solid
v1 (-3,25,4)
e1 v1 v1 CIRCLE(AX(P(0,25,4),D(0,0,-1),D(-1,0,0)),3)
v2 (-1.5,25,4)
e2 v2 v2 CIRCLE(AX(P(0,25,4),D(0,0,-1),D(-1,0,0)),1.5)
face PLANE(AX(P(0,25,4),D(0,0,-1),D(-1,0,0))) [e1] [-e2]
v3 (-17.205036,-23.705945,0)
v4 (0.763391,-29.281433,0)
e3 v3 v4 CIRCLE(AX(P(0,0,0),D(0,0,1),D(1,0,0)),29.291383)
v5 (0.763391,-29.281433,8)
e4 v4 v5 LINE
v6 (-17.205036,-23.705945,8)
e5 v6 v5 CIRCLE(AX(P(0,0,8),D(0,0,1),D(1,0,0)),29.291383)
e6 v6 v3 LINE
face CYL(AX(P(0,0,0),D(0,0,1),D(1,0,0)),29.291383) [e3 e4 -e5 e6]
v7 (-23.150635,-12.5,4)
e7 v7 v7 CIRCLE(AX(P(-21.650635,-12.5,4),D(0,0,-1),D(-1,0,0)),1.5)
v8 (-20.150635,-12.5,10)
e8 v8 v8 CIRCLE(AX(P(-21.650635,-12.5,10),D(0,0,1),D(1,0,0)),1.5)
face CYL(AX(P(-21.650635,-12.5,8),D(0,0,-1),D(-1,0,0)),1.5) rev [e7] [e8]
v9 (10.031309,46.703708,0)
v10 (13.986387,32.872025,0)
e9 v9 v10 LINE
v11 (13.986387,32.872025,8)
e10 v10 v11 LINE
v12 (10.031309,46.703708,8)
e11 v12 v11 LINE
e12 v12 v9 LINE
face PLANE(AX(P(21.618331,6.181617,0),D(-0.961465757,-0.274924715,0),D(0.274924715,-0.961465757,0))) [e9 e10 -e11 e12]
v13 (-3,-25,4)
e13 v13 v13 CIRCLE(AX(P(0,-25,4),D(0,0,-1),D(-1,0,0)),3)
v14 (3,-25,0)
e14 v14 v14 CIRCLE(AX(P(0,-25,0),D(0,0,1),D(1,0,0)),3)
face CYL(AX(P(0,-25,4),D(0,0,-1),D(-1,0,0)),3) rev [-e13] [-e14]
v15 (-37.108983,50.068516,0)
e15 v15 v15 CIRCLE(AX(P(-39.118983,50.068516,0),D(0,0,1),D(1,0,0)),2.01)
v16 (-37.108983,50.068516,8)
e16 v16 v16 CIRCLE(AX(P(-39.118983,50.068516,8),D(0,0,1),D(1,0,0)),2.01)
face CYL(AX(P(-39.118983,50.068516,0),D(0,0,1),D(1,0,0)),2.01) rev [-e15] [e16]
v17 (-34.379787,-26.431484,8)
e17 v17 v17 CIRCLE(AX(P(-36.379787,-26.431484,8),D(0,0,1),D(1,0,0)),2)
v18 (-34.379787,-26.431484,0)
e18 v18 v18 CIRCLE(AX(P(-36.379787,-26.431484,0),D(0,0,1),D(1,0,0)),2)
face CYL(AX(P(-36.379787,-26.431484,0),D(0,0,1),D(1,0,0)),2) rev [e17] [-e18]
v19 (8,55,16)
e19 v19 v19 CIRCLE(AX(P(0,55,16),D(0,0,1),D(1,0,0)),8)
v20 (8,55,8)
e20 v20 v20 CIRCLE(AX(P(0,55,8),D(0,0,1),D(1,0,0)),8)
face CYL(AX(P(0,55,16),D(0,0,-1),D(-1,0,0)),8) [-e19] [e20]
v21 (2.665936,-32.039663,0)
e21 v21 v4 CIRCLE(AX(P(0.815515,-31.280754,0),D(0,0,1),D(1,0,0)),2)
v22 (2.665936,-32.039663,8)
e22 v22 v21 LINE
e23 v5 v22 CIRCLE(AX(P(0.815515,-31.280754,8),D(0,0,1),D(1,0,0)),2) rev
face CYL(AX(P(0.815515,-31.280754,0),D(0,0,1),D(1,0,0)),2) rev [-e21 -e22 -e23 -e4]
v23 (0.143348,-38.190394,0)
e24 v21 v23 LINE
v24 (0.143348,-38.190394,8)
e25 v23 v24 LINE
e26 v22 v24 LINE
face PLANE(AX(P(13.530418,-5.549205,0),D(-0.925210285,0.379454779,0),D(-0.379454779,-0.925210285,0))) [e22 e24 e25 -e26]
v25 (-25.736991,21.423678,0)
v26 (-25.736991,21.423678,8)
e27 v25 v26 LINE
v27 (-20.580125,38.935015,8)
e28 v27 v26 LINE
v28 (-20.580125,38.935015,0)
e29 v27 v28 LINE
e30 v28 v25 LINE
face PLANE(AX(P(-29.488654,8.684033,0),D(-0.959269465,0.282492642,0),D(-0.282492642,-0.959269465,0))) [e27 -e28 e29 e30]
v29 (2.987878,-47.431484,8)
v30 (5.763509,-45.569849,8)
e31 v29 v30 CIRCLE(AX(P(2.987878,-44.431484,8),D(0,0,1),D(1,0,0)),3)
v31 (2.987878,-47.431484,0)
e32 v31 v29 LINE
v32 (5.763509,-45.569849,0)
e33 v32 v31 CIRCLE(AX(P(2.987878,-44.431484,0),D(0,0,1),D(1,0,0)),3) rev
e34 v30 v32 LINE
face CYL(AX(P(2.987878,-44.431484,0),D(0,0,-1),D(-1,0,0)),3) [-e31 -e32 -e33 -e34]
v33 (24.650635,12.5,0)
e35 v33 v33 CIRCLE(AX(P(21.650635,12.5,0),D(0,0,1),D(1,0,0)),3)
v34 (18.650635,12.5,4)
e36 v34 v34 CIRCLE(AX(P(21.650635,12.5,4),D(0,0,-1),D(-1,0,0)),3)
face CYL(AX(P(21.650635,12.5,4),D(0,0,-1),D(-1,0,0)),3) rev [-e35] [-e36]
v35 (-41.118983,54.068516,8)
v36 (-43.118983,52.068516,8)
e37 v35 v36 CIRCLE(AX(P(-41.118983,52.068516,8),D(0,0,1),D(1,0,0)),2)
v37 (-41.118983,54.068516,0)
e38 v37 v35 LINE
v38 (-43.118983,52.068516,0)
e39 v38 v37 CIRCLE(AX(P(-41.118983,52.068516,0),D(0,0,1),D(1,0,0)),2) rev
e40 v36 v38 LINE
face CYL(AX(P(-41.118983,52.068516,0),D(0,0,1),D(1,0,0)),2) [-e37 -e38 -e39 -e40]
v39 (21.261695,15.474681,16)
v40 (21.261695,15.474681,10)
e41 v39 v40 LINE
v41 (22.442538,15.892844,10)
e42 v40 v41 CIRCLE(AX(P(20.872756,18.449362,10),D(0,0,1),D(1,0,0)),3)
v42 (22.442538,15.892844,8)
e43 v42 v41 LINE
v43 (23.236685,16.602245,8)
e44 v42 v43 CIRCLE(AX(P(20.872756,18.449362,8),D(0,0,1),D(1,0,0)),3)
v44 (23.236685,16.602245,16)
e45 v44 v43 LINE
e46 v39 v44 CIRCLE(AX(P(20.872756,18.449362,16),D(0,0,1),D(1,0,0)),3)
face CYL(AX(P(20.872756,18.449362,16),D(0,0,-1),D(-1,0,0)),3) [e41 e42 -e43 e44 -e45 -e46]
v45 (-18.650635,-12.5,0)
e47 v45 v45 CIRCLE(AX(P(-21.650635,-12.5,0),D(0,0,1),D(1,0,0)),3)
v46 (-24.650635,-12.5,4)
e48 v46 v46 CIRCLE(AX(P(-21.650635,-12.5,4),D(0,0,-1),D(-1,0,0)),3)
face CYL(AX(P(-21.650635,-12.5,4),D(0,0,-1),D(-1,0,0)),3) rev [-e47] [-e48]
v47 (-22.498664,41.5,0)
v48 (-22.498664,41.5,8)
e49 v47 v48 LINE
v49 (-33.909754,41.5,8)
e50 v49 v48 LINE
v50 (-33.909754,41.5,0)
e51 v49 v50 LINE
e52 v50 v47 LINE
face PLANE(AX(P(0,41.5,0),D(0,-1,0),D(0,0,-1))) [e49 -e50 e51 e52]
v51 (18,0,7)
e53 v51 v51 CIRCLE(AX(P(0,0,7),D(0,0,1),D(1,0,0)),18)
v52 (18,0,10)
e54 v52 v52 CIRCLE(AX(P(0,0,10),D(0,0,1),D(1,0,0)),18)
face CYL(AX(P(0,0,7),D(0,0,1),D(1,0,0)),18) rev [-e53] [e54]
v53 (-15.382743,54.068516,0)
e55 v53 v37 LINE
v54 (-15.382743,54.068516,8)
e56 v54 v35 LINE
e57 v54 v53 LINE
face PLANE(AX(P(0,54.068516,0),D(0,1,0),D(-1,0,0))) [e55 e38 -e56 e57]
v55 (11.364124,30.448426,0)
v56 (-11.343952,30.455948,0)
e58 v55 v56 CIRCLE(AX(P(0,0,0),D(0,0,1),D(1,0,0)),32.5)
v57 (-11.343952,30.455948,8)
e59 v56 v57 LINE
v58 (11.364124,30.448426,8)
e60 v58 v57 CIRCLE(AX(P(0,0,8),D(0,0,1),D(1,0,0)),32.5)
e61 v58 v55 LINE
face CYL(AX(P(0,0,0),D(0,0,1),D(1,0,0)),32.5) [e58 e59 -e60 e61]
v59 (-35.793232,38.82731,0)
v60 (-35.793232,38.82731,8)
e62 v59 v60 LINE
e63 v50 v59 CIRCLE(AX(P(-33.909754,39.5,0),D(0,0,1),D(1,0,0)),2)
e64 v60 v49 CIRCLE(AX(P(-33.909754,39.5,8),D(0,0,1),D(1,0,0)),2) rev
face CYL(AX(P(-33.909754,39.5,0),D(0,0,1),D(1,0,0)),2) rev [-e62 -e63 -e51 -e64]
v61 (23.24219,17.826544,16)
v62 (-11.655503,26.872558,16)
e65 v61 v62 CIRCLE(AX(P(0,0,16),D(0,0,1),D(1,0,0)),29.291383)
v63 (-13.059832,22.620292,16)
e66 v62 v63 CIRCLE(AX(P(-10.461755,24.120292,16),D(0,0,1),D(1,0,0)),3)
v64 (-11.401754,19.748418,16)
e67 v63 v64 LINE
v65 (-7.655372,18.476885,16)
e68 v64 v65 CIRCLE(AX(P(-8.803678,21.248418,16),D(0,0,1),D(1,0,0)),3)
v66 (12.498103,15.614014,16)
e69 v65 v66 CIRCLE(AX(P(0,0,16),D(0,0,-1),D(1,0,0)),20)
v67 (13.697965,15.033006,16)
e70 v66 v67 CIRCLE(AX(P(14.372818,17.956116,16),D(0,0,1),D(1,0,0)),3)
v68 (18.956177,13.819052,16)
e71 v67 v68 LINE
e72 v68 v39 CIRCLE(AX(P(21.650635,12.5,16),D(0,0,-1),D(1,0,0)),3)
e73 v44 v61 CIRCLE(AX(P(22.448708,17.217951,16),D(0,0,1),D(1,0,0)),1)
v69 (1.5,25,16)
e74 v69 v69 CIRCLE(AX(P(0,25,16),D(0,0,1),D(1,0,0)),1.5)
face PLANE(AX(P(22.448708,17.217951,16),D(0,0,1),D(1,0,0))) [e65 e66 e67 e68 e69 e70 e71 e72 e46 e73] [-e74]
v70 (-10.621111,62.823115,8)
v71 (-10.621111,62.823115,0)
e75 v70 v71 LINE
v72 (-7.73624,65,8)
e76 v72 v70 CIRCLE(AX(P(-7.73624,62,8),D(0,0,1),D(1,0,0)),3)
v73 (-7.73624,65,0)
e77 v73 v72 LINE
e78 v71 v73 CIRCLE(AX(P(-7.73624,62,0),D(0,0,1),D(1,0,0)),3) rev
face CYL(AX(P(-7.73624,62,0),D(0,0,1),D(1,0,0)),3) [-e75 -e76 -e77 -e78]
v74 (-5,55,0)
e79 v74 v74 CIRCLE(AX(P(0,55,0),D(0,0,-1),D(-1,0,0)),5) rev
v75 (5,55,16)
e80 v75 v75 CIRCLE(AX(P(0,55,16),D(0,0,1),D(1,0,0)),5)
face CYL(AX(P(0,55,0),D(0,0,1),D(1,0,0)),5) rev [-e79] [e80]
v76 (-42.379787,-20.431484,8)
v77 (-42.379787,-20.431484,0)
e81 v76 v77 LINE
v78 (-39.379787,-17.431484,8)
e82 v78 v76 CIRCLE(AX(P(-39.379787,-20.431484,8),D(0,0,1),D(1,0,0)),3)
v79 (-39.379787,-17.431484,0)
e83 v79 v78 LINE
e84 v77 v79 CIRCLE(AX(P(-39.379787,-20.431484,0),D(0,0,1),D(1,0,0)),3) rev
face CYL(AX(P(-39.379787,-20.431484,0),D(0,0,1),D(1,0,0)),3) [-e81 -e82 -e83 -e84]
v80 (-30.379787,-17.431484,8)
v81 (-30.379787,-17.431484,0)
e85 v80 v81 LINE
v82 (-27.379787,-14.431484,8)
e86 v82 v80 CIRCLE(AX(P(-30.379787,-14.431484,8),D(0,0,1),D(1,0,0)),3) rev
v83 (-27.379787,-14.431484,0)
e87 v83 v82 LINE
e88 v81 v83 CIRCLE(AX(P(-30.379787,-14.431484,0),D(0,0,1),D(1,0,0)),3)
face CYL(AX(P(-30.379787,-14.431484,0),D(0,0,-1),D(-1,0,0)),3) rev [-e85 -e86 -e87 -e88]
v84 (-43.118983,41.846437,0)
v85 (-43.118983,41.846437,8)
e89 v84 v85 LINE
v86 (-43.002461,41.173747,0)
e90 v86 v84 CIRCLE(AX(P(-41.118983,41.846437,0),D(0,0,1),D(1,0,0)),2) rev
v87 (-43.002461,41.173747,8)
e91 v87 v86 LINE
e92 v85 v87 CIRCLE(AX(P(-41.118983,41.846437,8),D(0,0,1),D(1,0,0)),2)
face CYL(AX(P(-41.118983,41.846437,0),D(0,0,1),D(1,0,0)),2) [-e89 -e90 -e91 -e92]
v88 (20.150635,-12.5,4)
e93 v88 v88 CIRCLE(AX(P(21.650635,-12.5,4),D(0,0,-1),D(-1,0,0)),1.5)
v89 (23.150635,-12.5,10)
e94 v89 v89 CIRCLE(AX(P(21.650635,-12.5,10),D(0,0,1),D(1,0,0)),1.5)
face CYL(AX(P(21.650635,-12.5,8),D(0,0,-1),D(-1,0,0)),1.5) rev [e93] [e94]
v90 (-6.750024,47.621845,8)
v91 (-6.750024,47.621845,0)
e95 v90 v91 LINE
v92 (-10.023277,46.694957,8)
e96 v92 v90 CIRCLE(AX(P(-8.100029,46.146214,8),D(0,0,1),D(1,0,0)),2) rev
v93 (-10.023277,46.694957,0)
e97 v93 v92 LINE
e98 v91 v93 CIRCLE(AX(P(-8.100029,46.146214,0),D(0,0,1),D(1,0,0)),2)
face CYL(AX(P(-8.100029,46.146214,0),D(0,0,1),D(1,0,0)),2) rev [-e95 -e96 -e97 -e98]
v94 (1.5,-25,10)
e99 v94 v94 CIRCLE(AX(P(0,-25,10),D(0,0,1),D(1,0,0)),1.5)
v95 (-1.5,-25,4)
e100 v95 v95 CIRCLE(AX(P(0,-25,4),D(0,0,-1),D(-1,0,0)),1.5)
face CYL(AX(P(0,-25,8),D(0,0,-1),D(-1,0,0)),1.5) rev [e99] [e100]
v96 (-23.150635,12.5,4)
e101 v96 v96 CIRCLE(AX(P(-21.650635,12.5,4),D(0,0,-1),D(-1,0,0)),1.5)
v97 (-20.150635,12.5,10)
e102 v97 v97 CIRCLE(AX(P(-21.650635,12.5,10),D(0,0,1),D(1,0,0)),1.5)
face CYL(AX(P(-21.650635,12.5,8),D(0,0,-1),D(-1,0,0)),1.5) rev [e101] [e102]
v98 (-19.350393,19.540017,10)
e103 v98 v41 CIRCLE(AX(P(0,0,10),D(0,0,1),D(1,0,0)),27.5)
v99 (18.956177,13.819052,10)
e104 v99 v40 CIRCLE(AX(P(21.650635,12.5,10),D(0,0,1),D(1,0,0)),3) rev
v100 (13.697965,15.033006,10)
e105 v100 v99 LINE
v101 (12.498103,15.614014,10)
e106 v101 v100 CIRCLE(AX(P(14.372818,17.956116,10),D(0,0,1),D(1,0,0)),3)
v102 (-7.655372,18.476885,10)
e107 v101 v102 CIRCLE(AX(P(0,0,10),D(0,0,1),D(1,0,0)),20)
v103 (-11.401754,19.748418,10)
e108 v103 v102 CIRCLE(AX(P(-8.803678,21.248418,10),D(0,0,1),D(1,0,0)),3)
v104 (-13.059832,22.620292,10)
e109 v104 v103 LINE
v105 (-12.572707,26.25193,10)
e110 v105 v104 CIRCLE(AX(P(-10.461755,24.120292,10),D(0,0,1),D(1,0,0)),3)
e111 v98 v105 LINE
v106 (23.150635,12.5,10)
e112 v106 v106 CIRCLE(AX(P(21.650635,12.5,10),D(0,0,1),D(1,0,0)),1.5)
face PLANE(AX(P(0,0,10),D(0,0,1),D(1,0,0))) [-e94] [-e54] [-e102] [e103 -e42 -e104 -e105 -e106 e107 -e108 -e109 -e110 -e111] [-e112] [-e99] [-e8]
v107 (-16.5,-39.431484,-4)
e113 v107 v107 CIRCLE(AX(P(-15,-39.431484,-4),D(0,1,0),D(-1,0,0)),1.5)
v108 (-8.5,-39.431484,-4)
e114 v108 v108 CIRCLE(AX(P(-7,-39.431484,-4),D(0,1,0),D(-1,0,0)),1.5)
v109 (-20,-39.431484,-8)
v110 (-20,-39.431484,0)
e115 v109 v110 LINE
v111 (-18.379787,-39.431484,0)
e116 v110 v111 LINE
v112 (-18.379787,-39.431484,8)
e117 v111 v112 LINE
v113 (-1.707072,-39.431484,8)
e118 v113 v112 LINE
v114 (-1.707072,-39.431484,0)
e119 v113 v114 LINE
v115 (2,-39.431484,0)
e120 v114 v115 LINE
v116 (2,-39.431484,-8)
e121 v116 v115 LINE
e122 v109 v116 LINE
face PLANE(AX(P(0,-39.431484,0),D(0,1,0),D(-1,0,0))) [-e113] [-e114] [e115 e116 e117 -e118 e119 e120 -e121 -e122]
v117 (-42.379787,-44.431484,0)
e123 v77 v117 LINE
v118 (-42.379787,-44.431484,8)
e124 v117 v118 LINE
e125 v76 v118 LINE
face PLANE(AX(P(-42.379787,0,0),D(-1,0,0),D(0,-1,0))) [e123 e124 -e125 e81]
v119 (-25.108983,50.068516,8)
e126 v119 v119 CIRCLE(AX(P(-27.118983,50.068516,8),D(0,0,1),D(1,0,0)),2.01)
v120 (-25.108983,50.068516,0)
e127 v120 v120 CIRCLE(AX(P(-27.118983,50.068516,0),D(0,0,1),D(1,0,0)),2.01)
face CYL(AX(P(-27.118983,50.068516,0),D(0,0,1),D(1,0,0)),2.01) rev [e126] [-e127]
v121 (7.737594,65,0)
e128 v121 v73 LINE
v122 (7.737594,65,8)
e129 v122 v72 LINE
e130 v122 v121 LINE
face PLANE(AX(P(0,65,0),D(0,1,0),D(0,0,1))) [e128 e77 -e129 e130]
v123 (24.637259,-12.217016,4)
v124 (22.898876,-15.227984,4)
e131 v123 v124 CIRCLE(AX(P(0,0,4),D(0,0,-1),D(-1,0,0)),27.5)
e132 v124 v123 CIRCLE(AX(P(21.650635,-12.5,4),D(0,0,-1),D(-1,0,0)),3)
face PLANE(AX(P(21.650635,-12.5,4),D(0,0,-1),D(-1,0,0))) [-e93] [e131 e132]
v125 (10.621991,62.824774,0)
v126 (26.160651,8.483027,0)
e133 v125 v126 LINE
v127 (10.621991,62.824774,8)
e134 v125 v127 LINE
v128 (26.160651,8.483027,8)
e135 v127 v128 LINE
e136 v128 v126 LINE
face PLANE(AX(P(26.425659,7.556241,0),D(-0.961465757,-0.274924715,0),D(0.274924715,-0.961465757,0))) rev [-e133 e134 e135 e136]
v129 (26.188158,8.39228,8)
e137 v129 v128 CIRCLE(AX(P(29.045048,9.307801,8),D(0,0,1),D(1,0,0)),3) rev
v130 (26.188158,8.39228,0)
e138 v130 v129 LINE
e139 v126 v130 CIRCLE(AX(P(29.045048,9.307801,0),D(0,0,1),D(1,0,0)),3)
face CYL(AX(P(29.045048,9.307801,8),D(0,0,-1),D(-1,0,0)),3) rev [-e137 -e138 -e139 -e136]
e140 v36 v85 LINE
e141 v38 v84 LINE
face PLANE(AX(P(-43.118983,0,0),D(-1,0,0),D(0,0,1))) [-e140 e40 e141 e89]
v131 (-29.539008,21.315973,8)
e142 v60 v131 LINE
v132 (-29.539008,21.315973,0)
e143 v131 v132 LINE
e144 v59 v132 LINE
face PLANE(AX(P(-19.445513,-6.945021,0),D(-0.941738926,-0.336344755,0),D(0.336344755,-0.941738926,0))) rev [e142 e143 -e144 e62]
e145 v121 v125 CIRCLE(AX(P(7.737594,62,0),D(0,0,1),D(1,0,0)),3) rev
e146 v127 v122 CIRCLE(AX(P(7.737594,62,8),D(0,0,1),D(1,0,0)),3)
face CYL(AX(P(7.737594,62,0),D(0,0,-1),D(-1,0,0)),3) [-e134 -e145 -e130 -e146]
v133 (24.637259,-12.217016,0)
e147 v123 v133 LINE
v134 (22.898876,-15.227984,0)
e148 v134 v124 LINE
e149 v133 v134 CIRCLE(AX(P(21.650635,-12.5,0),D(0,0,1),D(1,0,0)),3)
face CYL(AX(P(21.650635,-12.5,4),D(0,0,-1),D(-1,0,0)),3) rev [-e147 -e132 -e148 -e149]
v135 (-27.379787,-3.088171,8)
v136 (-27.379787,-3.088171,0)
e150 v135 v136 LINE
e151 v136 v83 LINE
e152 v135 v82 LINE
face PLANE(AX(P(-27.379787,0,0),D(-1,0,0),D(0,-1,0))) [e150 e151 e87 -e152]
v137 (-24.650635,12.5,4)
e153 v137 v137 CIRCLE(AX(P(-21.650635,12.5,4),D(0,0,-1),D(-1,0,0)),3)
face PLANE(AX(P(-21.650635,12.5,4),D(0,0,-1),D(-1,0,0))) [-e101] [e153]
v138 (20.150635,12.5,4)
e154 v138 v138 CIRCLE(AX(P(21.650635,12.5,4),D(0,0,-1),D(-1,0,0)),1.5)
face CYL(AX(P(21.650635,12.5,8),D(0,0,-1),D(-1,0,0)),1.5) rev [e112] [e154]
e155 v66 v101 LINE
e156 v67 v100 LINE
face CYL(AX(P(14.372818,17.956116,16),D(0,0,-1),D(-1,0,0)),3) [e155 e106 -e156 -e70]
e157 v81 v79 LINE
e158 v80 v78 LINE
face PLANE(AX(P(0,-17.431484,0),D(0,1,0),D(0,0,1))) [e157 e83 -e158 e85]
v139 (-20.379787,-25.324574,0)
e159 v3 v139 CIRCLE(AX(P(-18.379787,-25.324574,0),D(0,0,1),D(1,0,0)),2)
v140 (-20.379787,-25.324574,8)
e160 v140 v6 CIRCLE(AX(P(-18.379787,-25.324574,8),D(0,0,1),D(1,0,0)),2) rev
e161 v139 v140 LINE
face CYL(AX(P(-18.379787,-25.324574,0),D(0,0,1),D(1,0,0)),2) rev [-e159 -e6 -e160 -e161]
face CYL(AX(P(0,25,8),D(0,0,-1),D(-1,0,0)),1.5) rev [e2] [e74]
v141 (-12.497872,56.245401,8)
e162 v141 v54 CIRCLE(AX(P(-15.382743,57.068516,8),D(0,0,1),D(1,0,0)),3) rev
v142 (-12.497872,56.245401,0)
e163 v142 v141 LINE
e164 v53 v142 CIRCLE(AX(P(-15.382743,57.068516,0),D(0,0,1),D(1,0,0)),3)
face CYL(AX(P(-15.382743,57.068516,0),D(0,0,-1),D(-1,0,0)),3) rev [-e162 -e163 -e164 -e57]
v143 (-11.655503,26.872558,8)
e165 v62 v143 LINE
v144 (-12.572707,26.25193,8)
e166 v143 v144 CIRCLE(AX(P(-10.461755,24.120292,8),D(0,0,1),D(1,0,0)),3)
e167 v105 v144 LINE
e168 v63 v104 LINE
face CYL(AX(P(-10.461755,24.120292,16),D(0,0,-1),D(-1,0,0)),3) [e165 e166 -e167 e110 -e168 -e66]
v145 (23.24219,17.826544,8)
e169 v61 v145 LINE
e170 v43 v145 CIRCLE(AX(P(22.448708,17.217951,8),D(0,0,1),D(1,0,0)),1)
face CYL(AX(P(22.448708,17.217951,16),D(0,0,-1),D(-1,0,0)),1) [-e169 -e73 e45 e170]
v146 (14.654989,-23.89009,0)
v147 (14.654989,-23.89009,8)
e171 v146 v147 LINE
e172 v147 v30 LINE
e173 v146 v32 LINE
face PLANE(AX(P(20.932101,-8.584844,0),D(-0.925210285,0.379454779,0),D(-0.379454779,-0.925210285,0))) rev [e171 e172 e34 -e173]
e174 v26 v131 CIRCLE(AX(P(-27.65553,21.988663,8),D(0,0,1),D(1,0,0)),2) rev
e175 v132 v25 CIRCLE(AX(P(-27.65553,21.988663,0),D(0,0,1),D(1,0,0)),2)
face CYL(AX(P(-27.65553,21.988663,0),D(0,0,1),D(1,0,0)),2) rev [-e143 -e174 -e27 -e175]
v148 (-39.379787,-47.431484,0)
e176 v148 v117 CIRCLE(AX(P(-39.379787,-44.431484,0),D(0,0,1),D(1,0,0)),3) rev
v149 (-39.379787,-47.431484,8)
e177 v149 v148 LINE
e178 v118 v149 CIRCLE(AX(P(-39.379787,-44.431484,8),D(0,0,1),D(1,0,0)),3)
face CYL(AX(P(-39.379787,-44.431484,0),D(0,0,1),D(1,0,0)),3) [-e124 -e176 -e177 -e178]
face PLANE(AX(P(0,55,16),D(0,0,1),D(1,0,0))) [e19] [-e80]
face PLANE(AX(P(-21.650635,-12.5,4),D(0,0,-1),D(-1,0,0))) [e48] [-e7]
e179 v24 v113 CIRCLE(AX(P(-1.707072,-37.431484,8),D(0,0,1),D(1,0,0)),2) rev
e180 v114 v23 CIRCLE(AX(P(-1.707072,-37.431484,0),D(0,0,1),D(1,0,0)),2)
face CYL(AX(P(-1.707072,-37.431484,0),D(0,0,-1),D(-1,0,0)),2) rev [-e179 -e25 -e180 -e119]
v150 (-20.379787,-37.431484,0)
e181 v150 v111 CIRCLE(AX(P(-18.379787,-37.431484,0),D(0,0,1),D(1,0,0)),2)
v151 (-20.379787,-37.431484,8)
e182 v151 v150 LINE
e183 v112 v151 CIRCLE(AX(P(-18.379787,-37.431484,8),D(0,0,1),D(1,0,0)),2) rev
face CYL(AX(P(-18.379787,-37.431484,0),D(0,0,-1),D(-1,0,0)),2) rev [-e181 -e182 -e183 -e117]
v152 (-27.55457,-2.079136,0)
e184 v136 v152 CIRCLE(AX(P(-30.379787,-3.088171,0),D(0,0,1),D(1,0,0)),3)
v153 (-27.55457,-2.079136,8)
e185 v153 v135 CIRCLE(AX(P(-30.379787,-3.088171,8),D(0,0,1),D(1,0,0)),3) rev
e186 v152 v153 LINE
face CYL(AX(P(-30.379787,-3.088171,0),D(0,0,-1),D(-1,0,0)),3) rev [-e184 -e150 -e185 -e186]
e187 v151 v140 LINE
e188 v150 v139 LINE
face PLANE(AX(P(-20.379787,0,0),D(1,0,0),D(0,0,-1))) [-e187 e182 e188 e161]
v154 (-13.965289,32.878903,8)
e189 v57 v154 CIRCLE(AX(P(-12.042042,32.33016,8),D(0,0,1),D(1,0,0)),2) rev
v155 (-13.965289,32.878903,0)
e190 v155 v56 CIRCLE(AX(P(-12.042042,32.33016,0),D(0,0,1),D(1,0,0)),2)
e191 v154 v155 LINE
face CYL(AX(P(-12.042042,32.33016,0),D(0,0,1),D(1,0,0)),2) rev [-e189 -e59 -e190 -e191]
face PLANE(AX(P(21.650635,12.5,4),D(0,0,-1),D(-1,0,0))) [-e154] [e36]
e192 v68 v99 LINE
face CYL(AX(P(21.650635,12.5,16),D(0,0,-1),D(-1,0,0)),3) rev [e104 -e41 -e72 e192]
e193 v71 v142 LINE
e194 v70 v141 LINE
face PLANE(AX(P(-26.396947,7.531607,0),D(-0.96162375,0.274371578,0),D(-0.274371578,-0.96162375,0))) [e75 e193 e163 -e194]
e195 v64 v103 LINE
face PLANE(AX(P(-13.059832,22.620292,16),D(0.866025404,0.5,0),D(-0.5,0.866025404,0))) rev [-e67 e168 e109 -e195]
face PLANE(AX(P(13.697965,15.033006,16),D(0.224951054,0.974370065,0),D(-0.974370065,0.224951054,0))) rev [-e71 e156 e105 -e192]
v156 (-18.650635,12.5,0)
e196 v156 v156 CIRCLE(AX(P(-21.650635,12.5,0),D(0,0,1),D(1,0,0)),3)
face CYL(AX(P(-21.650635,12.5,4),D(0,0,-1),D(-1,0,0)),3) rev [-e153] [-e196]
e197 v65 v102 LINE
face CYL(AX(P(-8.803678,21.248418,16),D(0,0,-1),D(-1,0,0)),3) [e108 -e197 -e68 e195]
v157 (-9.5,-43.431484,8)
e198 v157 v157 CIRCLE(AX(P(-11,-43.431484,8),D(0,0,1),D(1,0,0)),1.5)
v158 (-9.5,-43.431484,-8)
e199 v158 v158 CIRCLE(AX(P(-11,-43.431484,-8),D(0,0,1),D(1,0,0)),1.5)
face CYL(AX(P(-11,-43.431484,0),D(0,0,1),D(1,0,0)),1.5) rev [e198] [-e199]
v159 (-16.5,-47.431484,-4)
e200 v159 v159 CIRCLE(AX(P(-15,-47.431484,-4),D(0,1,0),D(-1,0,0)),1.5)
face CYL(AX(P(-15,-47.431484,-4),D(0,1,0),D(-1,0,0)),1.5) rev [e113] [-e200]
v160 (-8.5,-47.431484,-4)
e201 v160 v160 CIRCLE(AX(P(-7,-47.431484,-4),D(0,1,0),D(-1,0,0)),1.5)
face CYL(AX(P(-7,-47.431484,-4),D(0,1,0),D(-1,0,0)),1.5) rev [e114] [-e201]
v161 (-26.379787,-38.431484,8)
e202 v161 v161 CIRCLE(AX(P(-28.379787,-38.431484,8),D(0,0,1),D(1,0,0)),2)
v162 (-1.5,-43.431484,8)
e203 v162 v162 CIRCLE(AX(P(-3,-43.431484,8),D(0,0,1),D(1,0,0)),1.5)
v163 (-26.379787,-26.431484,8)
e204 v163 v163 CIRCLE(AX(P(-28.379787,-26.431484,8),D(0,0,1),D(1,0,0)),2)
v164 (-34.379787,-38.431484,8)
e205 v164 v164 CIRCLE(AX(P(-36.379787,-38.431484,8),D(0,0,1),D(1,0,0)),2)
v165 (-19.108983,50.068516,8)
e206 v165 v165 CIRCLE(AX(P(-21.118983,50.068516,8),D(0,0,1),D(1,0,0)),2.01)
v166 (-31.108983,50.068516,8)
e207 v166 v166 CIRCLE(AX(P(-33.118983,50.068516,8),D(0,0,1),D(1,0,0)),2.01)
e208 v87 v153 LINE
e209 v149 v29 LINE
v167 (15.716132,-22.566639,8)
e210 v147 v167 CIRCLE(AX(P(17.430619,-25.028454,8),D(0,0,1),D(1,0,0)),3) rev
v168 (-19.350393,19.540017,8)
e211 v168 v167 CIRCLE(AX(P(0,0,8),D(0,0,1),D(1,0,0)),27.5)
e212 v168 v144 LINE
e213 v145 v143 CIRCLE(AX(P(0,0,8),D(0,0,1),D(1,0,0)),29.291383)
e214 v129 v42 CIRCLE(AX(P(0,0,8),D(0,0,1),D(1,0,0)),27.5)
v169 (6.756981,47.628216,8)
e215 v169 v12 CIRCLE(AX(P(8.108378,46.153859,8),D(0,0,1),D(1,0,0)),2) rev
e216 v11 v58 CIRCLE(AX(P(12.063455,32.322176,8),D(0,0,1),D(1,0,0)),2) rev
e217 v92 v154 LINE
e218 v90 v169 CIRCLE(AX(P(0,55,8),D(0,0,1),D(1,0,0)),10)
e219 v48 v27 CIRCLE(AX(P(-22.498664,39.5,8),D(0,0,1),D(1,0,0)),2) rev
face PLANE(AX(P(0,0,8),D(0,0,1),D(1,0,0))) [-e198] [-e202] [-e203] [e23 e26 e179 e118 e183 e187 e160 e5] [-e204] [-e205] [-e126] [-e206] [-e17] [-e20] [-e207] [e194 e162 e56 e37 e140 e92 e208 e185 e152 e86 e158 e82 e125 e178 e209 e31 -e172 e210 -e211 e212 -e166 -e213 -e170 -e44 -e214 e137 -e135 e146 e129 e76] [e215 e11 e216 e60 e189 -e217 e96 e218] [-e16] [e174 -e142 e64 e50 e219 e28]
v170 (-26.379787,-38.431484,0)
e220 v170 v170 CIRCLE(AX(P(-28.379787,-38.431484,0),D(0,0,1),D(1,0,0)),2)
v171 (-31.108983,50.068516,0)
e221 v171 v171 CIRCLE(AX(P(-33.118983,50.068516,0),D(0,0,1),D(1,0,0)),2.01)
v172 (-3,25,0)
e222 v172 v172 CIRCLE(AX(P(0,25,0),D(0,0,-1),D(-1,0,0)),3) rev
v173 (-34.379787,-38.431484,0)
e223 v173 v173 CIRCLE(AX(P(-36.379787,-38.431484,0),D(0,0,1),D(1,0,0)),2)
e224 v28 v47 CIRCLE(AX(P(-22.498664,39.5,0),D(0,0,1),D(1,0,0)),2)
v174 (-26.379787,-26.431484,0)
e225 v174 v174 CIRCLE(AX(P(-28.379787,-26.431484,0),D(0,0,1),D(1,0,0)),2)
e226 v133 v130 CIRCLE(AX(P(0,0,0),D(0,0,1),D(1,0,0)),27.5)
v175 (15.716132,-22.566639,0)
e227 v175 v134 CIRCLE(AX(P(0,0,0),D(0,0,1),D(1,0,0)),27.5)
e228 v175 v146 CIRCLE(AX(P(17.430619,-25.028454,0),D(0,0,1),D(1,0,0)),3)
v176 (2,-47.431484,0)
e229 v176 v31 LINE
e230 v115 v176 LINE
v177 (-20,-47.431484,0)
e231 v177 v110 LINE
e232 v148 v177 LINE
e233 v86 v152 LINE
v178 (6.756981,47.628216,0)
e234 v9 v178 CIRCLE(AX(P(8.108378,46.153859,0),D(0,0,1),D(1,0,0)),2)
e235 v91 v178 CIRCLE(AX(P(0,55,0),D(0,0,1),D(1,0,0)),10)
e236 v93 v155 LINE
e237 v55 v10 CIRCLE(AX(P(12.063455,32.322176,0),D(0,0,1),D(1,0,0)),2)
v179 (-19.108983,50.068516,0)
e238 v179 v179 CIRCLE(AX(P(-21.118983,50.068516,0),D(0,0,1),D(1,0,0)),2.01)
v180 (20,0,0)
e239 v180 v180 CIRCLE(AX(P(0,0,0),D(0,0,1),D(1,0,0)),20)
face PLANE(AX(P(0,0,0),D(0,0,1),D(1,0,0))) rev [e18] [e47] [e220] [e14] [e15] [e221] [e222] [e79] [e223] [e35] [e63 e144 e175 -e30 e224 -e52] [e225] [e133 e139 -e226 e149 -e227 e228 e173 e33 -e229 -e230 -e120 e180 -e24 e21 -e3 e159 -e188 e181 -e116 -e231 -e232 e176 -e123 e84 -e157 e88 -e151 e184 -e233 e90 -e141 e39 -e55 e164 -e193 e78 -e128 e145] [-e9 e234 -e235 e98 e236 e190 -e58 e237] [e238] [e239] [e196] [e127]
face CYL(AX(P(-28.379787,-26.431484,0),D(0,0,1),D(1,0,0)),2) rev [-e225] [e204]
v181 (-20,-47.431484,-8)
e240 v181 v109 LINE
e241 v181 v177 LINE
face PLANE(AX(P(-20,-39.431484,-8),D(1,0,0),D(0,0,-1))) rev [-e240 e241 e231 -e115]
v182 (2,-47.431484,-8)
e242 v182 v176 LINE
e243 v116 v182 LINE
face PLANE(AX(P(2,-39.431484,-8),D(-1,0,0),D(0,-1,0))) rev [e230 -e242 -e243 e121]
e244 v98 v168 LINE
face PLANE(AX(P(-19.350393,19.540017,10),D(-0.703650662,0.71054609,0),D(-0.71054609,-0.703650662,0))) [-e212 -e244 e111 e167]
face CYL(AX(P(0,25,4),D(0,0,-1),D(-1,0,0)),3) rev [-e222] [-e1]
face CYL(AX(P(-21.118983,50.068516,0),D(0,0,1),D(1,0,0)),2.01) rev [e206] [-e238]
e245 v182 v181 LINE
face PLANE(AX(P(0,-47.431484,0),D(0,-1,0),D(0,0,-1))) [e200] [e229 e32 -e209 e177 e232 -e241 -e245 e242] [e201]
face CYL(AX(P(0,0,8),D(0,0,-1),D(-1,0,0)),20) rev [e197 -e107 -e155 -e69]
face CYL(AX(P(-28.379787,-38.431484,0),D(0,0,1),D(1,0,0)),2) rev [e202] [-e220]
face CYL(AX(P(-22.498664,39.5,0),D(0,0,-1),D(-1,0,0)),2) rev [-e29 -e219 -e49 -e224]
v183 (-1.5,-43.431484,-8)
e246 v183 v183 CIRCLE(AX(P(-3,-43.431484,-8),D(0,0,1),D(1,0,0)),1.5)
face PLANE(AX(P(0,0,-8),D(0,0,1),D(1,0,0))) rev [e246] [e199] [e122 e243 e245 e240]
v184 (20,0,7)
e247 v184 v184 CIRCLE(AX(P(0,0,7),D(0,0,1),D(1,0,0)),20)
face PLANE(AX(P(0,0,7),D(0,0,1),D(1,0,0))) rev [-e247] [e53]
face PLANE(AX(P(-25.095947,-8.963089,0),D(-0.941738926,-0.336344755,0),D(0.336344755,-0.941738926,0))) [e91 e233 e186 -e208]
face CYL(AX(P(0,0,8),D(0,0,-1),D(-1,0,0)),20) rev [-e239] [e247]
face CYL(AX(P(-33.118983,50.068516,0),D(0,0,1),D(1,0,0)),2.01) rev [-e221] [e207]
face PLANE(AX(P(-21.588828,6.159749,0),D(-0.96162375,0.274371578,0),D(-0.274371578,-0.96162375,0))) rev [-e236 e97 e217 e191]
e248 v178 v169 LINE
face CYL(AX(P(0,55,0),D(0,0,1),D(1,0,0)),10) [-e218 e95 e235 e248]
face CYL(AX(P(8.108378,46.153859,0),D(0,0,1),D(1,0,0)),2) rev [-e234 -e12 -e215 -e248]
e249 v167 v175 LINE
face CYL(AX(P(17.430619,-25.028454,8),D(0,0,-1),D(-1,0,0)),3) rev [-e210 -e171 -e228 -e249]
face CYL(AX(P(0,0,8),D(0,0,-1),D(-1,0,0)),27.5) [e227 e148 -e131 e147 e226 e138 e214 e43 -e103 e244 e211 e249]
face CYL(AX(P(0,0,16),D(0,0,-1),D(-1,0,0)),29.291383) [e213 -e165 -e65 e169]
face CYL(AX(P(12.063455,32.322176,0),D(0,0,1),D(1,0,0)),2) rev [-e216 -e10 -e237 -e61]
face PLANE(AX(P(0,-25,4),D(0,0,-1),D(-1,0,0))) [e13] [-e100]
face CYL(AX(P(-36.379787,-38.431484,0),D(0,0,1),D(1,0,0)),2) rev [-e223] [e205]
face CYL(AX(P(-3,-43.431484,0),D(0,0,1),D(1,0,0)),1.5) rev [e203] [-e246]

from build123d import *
from build123d.topology import SkipClean

# Parameters (mm, degrees)
SKETCH_1_R           = 27.5
SKETCH_1_R_2         = 20
SKETCH_1_R_3         = 1.5000000000000004
SKETCH_1_R_4         = 1.4999999999999996
SKETCH_1_R_5         = 1.5000000000000007
SKETCH_1_R_6         = 1.5000000000000002
EXTRUDE_1_DEPTH      = 8
EXTRUDE_START        = -8
SKETCH_2_R           = 4.999999999999999
EXTRUDE_2_DEPTH      = 8
EXTRUDE_3_DEPTH      = 8
SKETCH_6_R           = 2.0000000000000036
CUT_EXTRUDE_1_DEPTH  = 8
FILLET_1_R           = 2
EXTRUDE_5_DEPTH      = 8
FILLET_2_R           = 2
FILLET_3_R           = 3
SKETCH_8_R           = 2.009999999999999
SKETCH_8_R_2         = 2.010000000000004
CUT_EXTRUDE_2_DEPTH  = 8
SKETCH_9_R           = 1.5000000000000024
SKETCH_9_R_2         = 1.5000000000000022
CUT_EXTRUDE_3_DEPTH  = 8
EXTRUDE_START_2      = 8
SKETCH_14_R          = 8
SKETCH_14_R_2        = 5.000000000000004
EXTRUDE_7_DEPTH      = 8
SKETCH_15_R          = 1.5000000000000007
EXTRUDE_8_DEPTH      = 8
FILLET_4_R           = 3
FILLET_6_R           = 3
FILLET_9_R           = 1
FILLET_10_R          = 3
SKETCH_17_R          = 2.9999999999999996
SKETCH_17_R_2        = 2.999999999999998
SKETCH_17_R_3        = 3.0000000000000004
SKETCH_17_R_4        = 2.9999999999999982
SKETCH_17_R_5        = 2.999999999999999
CUT_EXTRUDE_6_DEPTH  = 12
CUT_EXTRUDE_7_DEPTH  = 8
FILLET_13_R          = 3
FILLET_14_R          = 1
SKETCH_19_R          = 8
SKETCH_19_R_2        = 5.0000000000000036
EXTRUDE_10_DEPTH     = 8
SKETCH_20_W          = 49.17006245268253
SKETCH_20_H          = 8.929503743070258
CUT_EXTRUDE_9_DEPTH  = 80.6256664475702
EXTRUDE_11_DEPTH     = 8
SKETCH_22_R          = 1.5000000000000002
SKETCH_22_R_2        = 1.4999999999999996
CUT_EXTRUDE_10_DEPTH = 115.11039231256969
SKETCH_23_R          = 1.5000000000000024
SKETCH_23_R_2        = 1.5000000000000036
CUT_EXTRUDE_11_DEPTH = 80.62566631178612
EXTRUDE_START_3      = -1
SKETCH_25_R          = 20
SKETCH_25_R_2        = 18.000000000000004
EXTRUDE_12_DEPTH     = 1
SKETCH_26_R          = 27.5
SKETCH_26_R_2        = 18.000000000000004
EXTRUDE_13_DEPTH     = 2
SKETCH_28_R          = 1.5000000000000002
SKETCH_28_R_2        = 1.4999999999999996
SKETCH_28_R_3        = 1.5000000000000007
SKETCH_28_R_4        = 1.5
SKETCH_28_R_5        = 1.4999999999999993
CUT_EXTRUDE_12_DEPTH = 10


with BuildPart() as part:
    # 草图1 → 凸台-拉伸1 (new body)
    with BuildSketch(Plane.XY):
        Circle(SKETCH_1_R)
        Circle(SKETCH_1_R_2, mode=Mode.SUBTRACT)
        with Locations((0, 25)):
            Circle(SKETCH_1_R_3, mode=Mode.SUBTRACT)
        with Locations((21.650635094610998, 12.49999999999995)):
            Circle(SKETCH_1_R_4, mode=Mode.SUBTRACT)
        with Locations((21.650635094610916, -12.500000000000105)):
            Circle(SKETCH_1_R_5, mode=Mode.SUBTRACT)
        with Locations((-1.7457e-13, -25)):
            Circle(SKETCH_1_R_6, mode=Mode.SUBTRACT)
        with Locations((-21.65063509461109, -12.499999999999801)):
            Circle(SKETCH_1_R_3, mode=Mode.SUBTRACT)
        with Locations((-21.65063509461082, 12.500000000000254)):
            Circle(SKETCH_1_R_4, mode=Mode.SUBTRACT)
    extrude(amount=EXTRUDE_1_DEPTH)

    # 草图2 → 凸台-拉伸2 (add)
    with BuildSketch(Plane.XY.offset(8).offset(EXTRUDE_START)):
        with BuildLine():
            ThreePointArc((-25.943936139173825, 9.119329888016473), (0.3603924360003816, 27.497638394816267), (26.174025002444875, 8.436255992523613))
            Line((26.17402500244488, 8.436255992523613), (10, 65))
            Line((10, 65), (-10, 65))
            Line((-10, 65), (-25.9439361391738, 9.119329888016466))
        make_face()
        with Locations((6.11e-15, 55)):
            Circle(SKETCH_2_R, mode=Mode.SUBTRACT)
        with BuildLine():
            ThreePointArc((-8.934964740604453, 50.509297929704616), (0.00579561060862899, 45.00000167945525), (8.940164009493113, 50.519657660025956))
            Line((8.940164009493113, 50.519657660025956), (15.166758498161308, 28.744033061810438))
            ThreePointArc((15.166758498161306, 28.744033061810434), (0.01443833162156238, 32.49999679283952), (-15.141213075085325, 28.757497572196108))
            Line((-15.141213075085329, 28.757497572196108), (-8.934964740604453, 50.509297929704616))
        make_face(mode=Mode.SUBTRACT)
    extrude(amount=EXTRUDE_2_DEPTH)

    # 草图4 → 凸台-拉伸3 (add)
    with BuildSketch(Plane.XY.offset(8).offset(EXTRUDE_START)):
        with BuildLine():
            ThreePointArc((15.000000000000005, -23.048861143232216), (-11.965613946200461, -24.76033285096331), (-27.379786827707274, -2.568515771667959))
            Line((-27.379786827707406, -2.568515771667964), (-27.379786827707402, -17.431484228333417))
            Line((-27.379786827707402, -17.431484228333417), (-42.3797868277074, -17.431484228333417))
            Line((-42.3797868277074, -17.431484228333417), (-42.37978682770739, -47.43148422833342))
            Line((-42.37978682770739, -47.43148422833342), (5, -47.43148422833342))
            Line((5.000000000000002, -47.43148422833342), (15.000000000000002, -23.04886114323222))
        make_face()
    extrude(amount=EXTRUDE_3_DEPTH)

    # 草图6 → 切除-拉伸1 (cut)
    with BuildSketch(Plane.XY.offset(8)):
        with BuildLine():
            Line((-20.379786827707523, -21.03923429485517), (-20.379786827707523, -39.431484228333424))
            Line((-20.379786827707523, -39.43148422833342), (-0.3656577887668905, -39.43148422833342))
            Line((-0.3656577887668906, -39.43148422833342), (3.9000445929543774, -29.030582891660615))
            ThreePointArc((3.9000445929543774, -29.030582891660618), (-9.1575591251104, -27.82308756638483), (-20.37978682770753, -21.039234294855163))
        make_face()
        with Locations((-28.379786827707523, -26.431484228333414)):
            Circle(SKETCH_6_R)
        with Locations((-36.37978682770753, -26.431484228333414)):
            Circle(SKETCH_6_R)
        with Locations((-36.3797868277074, -38.43148422833341)):
            Circle(SKETCH_6_R)
        with Locations((-28.3797868277074, -38.43148422833341)):
            Circle(SKETCH_6_R)
    extrude(amount=-CUT_EXTRUDE_1_DEPTH, mode=Mode.SUBTRACT)

    # 圆角1
    fillet_1_edges = [part.edges().sort_by_distance(p)[0] for p in [
        (-20.379786827707527, -21.039234294855166, 4),
        (3.900044592954378, -29.030582891660618, 4),
        (-0.36565778876689053, -39.43148422833342, 4),
        (-20.379786827707523, -39.43148422833342, 4),
    ]]
    fillet(fillet_1_edges, radius=FILLET_1_R)

    # 草图7 → 凸台-拉伸5 (add)
    with BuildSketch(Plane.XY.offset(8).offset(EXTRUDE_START)):
        with BuildLine():
            Line((-25.605980442528075, 10.303804702257906), (-13.118983471272958, 54.06851577166659))
            Line((-13.118983471272958, 54.06851577166659), (-43.118983471272955, 54.068515771666576))
            Line((-43.118983471272955, 54.068515771666576), (-43.118983471272955, 41.4999999999998))
            Line((-43.118983471272955, 41.4999999999998), (-27.379786827707406, -2.56851577166659))
            ThreePointArc((-27.379786827707278, -2.5685157716679656), (-27.2948033845881, 3.353163908412209), (-25.94393613917382, 9.119329888016479))
            Line((-25.9439361391738, 9.119329888016466), (-25.605980442528075, 10.303804702257906))
        make_face()
        Polygon((-19.824769918031997, 41.4999999999998), (-27.472571155541598, 15.530112253940402), (-36.74779095564553, 41.4999999999998), align=None, mode=Mode.SUBTRACT)
    extrude(amount=EXTRUDE_5_DEPTH)

    # 圆角2
    fillet_2_edges = [part.edges().sort_by_distance(p)[0] for p in [
        (-36.74779095564553, 41.4999999999998, 4),
        (-27.472571155541598, 15.530112253940402, 4),
        (-43.118983471272955, 41.4999999999998, 4),
        (-43.118983471272955, 54.068515771666576, 4),
        (-19.824769918031997, 41.4999999999998, 4),
        (15.166758498161306, 28.744033061810434, 4),
        (8.940164009493113, 50.519657660025956, 4),
        (-8.934964740604453, 50.509297929704616, 4),
        (-15.141213075085325, 28.757497572196108, 4),
    ]]
    fillet(fillet_2_edges, radius=FILLET_2_R)

    # 圆角3
    fillet_3_edges = [part.edges().sort_by_distance(p)[0] for p in [
        (-13.118983471272958, 54.06851577166659, 4),
        (26.174025002444875, 8.436255992523613, 4),
        (-10, 65, 4),
        (10, 65, 4),
        (15.000000000000004, -23.04886114323222, 4),
        (5.000000000000001, -47.43148422833342, 4),
        (-42.37978682770739, -47.43148422833342, 4),
        (-42.3797868277074, -17.431484228333417, 4),
        (-27.379786827707402, -17.431484228333417, 4),
        (-27.379786827707342, -2.568515771667963, 4),
    ]]
    fillet(fillet_3_edges, radius=FILLET_3_R)

    # 草图8 → 切除-拉伸2 (cut)
    with BuildSketch(Plane.XY.offset(8)):
        with Locations((-39.11898347127296, 50.06851577166658)):
            Circle(SKETCH_8_R)
        with Locations((-33.11898347127296, 50.06851577166658)):
            Circle(SKETCH_8_R)
        with Locations((-27.118983471272966, 50.06851577166658)):
            Circle(SKETCH_8_R_2)
        with Locations((-21.118983471272966, 50.06851577166658)):
            Circle(SKETCH_8_R)
    extrude(amount=-CUT_EXTRUDE_2_DEPTH, mode=Mode.SUBTRACT)

    # 草图9 → 切除-拉伸3 (cut)
    with BuildSketch(Plane.XY.offset(8)):
        with Locations((-10.999999999999996, -43.43148422833342)):
            Circle(SKETCH_9_R)
        with Locations((-2.9999999999999947, -43.43148422833342)):
            Circle(SKETCH_9_R_2)
    extrude(amount=-CUT_EXTRUDE_3_DEPTH, mode=Mode.SUBTRACT)

    # 草图14 → 凸台-拉伸7 (add)
    with BuildSketch(Plane(origin=(0, 0, 0), x_dir=(-1, 0, 0), z_dir=(0, 0, -1)).offset(EXTRUDE_START_2)):
        with Locations(Location((0, 55, 0), (0, 0, 180))):
            Circle(SKETCH_14_R)
        with Locations(Location((0, 55, 0), (0, 0, 180))):
            Circle(SKETCH_14_R_2, mode=Mode.SUBTRACT)
    extrude(amount=-EXTRUDE_7_DEPTH)

    # 草图15 → 凸台-拉伸8 (add)
    with SkipClean():  # the faces are left unmerged after this step: merging them gives an invalid solid
        with BuildSketch(Plane(origin=(0, 0, 0), x_dir=(-1, 0, 0), z_dir=(0, 0, -1)).offset(EXTRUDE_START_2)):
            with BuildLine():
                ThreePointArc((-13.007266130686366, 15.192466152850212), (-1.842024158780876, 19.914993020296734), (10.000000000000265, 17.320508075688622))
                Line((10.00000000000002, 17.32050807568876), (14.645691267883315, 25.36708138794168))
                ThreePointArc((14.645691267883036, 25.367081387941845), (-8.991224682055885, 27.877284114012973), (-26.707191449384325, 12.029589175967057))
                Line((-26.70719144938432, 12.029589175967057), (-13.007266130686364, 15.192466152850214))
            make_face()
            with Locations((0, 25)):
                Circle(SKETCH_15_R, mode=Mode.SUBTRACT)
        extrude(amount=-EXTRUDE_8_DEPTH)

    # 圆角4
    # the kernel refuses this fillet: 3 mm, written as the material it takes off along each edge
    with BuildSketch(Plane(origin=(-10.000000000000021, 17.320508075688764, -15.008771254956887), x_dir=(-0.5000000000000012, 0.8660254037844379, 0), z_dir=(0, 0, 1))) as fillet_4_piece_1:
        with BuildLine():
            CenterArc((2.803508501982758, -3), FILLET_4_R, 90, 82.50528254607332)
            ThreePointArc((-0.17086217218890562, -2.6086956521739126), (-0.04276125617296566, -1.3071425790207607), (0, 0))
            Line((0, 0), (2.8035085019827584, 1.4e-16))
        make_face()
    extrude(amount=15.008771254956887, mode=Mode.SUBTRACT)

    # 圆角6
    fillet_6_edges = [part.edges().sort_by_distance(p)[0] for p in [
        (-14.645691267883176, 25.367081387941763, -4),
    ]]
    fillet(fillet_6_edges, radius=FILLET_6_R)

    # 圆角9
    # the kernel refuses this fillet: 1 mm, written as the material it takes off along each edge
    with BuildSketch(Plane(origin=(26.70719144938433, 12.029589175967054, -13.373228593487674), x_dir=(-0.44386184302665843, 0.896095231716461, 0), z_dir=(0, 0, 1))) as fillet_9_piece_1:
        with BuildLine():
            CenterArc((2.112603318717673, 0.999326764350836), FILLET_9_R, 140.6494572188422, 131.45308899718444)
            Line((1.3393221393082273, 1.633390024263549), (0, 0))
            ThreePointArc((0, 0), (1.0746457186975409, -0.01972000293635641), (2.149291437395081, 4e-17))
        make_face()
    extrude(amount=13.373228593487674, mode=Mode.SUBTRACT)

    # 圆角10
    fillet_10_edges = [part.edges().sort_by_distance(p)[0] for p in [
        (13.007266130686366, 15.192466152850212, -4),
    ]]
    fillet(fillet_10_edges, radius=FILLET_10_R)

    # 草图17 → 切除-拉伸6 (cut)
    with BuildSketch(Plane(origin=(0, 0, -8), x_dir=(-1, 0, 0), z_dir=(0, 0, -1))):
        with Locations((0, 25)):
            Circle(SKETCH_17_R)
        with Locations((21.650635094610998, 12.49999999999995)):
            Circle(SKETCH_17_R_2)
        with Locations((21.650635094610916, -12.500000000000105)):
            Circle(SKETCH_17_R_3)
        with Locations((-1.7457e-13, -25)):
            Circle(SKETCH_17_R)
        with Locations((-21.65063509461109, -12.499999999999801)):
            Circle(SKETCH_17_R_4)
        with Locations((-21.65063509461082, 12.500000000000254)):
            Circle(SKETCH_17_R_5)
    extrude(amount=-CUT_EXTRUDE_6_DEPTH, mode=Mode.SUBTRACT)

    # 草图18 → 切除-拉伸7 (cut)
    with BuildSketch(Plane(origin=(0, 0, -8), x_dir=(-1, 0, 0), z_dir=(0, 0, -1))):
        with BuildLine():
            Line((-23.641270067668014, 17.293797744977688), (-28.493207902164144, 13.940184731791717))
            Line((-28.493207902164144, 13.940184731791717), (-24.910514504724148, 10.325925753757534))
            Line((-24.910514504724148, 10.325925753757534), (-23.875029741649886, 12.789125027835365))
            ThreePointArc((-23.875029741649886, 12.789125027835365), (-23.86467485561845, 15.046989254771407), (-23.641270067668014, 17.293797744977688))
        make_face()
    extrude(amount=-CUT_EXTRUDE_7_DEPTH, mode=Mode.SUBTRACT)

    # 圆角13
    # the kernel refuses this fillet: 3 mm, written as the material it takes off along each edge
    with BuildSketch(Plane(origin=(23.886783347866572, 14.499910245351591, 0), x_dir=(-0.9374558215707414, 0.34810426972837655, 0), z_dir=(0, 0, -1))) as fillet_13_piece_1:
        with BuildLine():
            CenterArc((4.200338707288567, 2.6532402568275613), FILLET_13_R, 182.28400165957783, 59.895420995337645)
            Line((1.2027220215556462, 2.5336818802260708), (1.1427696878409872, 2.531290712694039))
            ThreePointArc((1.1427696878409872, 2.531290712694039), (0.5099550648750645, 1.3102307377416786), (-0.05561957677165612, 0.02250472572021236))
            Line((-0.05561957677165612, 0.02250472572021236), (0.02800225804859122, -0.05306480513655184))
            ThreePointArc((0.02800225804859122, -0.05306480513655184), (1.4001129024295225, 0.28675974317244), (2.7722235468104546, -0.05306480513655148))
            Line((2.7722235468104546, -0.05306480513655148), (2.800225804859045, 1e-17))
        make_face()
    extrude(amount=15.011635031913391, mode=Mode.SUBTRACT)

    # 圆角14
    fillet_14_edges = [part.edges().sort_by_distance(p)[0] for p in [
        (23.641270067668014, 17.293797744977688, -4),
    ]]
    fillet(fillet_14_edges, radius=FILLET_14_R)

    # 草图19 → 凸台-拉伸10 (add)
    # profile 1 of 2: a face of its own
    with BuildSketch(Plane.XY.offset(8)):
        with Locations((0, 55)):
            Circle(SKETCH_19_R)
        with Locations((0, 55)):
            Circle(SKETCH_19_R_2, mode=Mode.SUBTRACT)
    # profile 2 of 2: a face of its own
    with BuildSketch(Plane.XY.offset(8)):
        with BuildLine():
            Line((13.697964906701117, 15.033005775819044), (18.956177372854704, 13.81905177520426))
            ThreePointArc((18.956177372854704, 13.81905177520426), (19.900746003665365, 14.936778235578963), (21.26169536538885, 15.474680804226606))
            ThreePointArc((21.26169536538885, 15.474680804226606), (22.36017683797403, 15.844063512569386), (23.23668463857468, 16.602245025349646))
            ThreePointArc((23.23668463857468, 16.602245025349646), (23.448698192397256, 17.213453445010128), (23.242190499098495, 17.82654401896863))
            ThreePointArc((23.242190499098495, 17.82654401896863), (7.349858824703768, 28.354270685622204), (-11.65550255308797, 26.872557583742758))
            ThreePointArc((-11.65550255308797, 26.872557583742758), (-13.310425612282504, 25.06107723096147), (-13.059831503909368, 22.620291703059625))
            Line((-13.059831503909368, 22.620291703059625), (-11.401754250991402, 19.74841765813149))
            ThreePointArc((-11.401754250991402, 19.74841765813149), (-9.767865477179877, 18.40758281863684), (-7.655372208380949, 18.476884920114337))
            ThreePointArc((-7.655372208380949, 18.476884920114337), (2.8128308191684352, 19.801211649359647), (12.498102669332805, 15.614013887108474))
            ThreePointArc((12.498102669332805, 15.614013887108474), (13.065351981738239, 15.256017374059338), (13.697964906701117, 15.033005775819044))
        make_face()
    extrude(amount=EXTRUDE_10_DEPTH)

    # 草图20 → 切除-拉伸9 (cut, through all)
    with BuildSketch(Plane(origin=(0, 0, 0), x_dir=(1, 0, 0), z_dir=(0, 1, 0))):
        with Locations((5.2284355189061404, 4.464751871535129)):
            Rectangle(SKETCH_20_W, SKETCH_20_H)
    extrude(amount=CUT_EXTRUDE_9_DEPTH, mode=Mode.SUBTRACT)

    # 草图21 → 凸台-拉伸11 (add)
    with BuildSketch(Plane(origin=(0, 0, 0), x_dir=(-1, 0, 0), z_dir=(0, 0, -1))):
        Polygon((19.999999999999993, -39.43148422833342), (-2.000000000000006, -39.43148422833341), (-2.000000000000009, -47.43148422833342), (19.999999999999993, -47.43148422833342), align=None)
    extrude(amount=EXTRUDE_11_DEPTH)

    # 草图22 → 切除-拉伸10 (cut, through all)
    with BuildSketch(Plane(origin=(1.367e-14, -39.43148422833342, 0), x_dir=(1, 3.5e-16, 0), z_dir=(-3.5e-16, 1, 0))):
        with Locations(Location((-15.000000000000007, 4, 0), (0, 0, 180))):
            Circle(SKETCH_22_R)
        with Locations(Location((-7.000000000000006, 4, 0), (0, 0, 180))):
            Circle(SKETCH_22_R_2)
    extrude(amount=-CUT_EXTRUDE_10_DEPTH, mode=Mode.SUBTRACT)

    # 草图23 → 切除-拉伸11 (cut, through all)
    with BuildSketch(Plane.XY):
        with Locations((-10.999999999999996, -43.43148422833342)):
            Circle(SKETCH_23_R)
        with Locations((-2.9999999999999947, -43.43148422833342)):
            Circle(SKETCH_23_R_2)
    extrude(amount=-CUT_EXTRUDE_11_DEPTH, mode=Mode.SUBTRACT)

    # 草图25 → 凸台-拉伸12 (add)
    with BuildSketch(Plane.XY.offset(8).offset(EXTRUDE_START_3)):
        Circle(SKETCH_25_R)
        Circle(SKETCH_25_R_2, mode=Mode.SUBTRACT)
    extrude(amount=EXTRUDE_12_DEPTH)

    # 草图26 → 凸台-拉伸13 (add)
    # profile 1 of 2: a face of its own
    with BuildSketch(Plane.XY.offset(8)):
        with BuildLine():
            Line((-12.572707277227936, 26.25192997406383), (-19.350393192825646, 19.54001748420525))
            ThreePointArc((-19.35039319282565, 19.54001748420525), (-16.55411083842956, 21.95931270210862), (-13.458548014285139, 23.98160723027507))
            ThreePointArc((-13.458548014285142, 23.981607230275067), (-13.256546042627143, 25.210770801124802), (-12.572707277227938, 26.25192997406383))
        make_face()
    # profile 2 of 2: a face of its own
    with BuildSketch(Plane.XY.offset(8)):
        Circle(SKETCH_26_R)
        Circle(SKETCH_26_R_2, mode=Mode.SUBTRACT)
    extrude(amount=EXTRUDE_13_DEPTH)

    # 草图28 → 切除-拉伸12 (cut)
    with BuildSketch(Plane(origin=(0, 0, 8), x_dir=(-1, 0, 0), z_dir=(0, 0, -1))):
        with Locations((0, 25)):
            Circle(SKETCH_28_R)
        with Locations((21.650635094610998, 12.49999999999995)):
            Circle(SKETCH_28_R_2)
        with Locations((21.650635094610916, -12.500000000000105)):
            Circle(SKETCH_28_R_3)
        with Locations((-1.7457e-13, -25)):
            Circle(SKETCH_28_R_4)
        with Locations((-21.65063509461109, -12.499999999999801)):
            Circle(SKETCH_28_R_5)
        with Locations((-21.65063509461082, 12.500000000000254)):
            Circle(SKETCH_28_R_2)
    extrude(amount=-CUT_EXTRUDE_12_DEPTH, mode=Mode.SUBTRACT)


solid = part.part
